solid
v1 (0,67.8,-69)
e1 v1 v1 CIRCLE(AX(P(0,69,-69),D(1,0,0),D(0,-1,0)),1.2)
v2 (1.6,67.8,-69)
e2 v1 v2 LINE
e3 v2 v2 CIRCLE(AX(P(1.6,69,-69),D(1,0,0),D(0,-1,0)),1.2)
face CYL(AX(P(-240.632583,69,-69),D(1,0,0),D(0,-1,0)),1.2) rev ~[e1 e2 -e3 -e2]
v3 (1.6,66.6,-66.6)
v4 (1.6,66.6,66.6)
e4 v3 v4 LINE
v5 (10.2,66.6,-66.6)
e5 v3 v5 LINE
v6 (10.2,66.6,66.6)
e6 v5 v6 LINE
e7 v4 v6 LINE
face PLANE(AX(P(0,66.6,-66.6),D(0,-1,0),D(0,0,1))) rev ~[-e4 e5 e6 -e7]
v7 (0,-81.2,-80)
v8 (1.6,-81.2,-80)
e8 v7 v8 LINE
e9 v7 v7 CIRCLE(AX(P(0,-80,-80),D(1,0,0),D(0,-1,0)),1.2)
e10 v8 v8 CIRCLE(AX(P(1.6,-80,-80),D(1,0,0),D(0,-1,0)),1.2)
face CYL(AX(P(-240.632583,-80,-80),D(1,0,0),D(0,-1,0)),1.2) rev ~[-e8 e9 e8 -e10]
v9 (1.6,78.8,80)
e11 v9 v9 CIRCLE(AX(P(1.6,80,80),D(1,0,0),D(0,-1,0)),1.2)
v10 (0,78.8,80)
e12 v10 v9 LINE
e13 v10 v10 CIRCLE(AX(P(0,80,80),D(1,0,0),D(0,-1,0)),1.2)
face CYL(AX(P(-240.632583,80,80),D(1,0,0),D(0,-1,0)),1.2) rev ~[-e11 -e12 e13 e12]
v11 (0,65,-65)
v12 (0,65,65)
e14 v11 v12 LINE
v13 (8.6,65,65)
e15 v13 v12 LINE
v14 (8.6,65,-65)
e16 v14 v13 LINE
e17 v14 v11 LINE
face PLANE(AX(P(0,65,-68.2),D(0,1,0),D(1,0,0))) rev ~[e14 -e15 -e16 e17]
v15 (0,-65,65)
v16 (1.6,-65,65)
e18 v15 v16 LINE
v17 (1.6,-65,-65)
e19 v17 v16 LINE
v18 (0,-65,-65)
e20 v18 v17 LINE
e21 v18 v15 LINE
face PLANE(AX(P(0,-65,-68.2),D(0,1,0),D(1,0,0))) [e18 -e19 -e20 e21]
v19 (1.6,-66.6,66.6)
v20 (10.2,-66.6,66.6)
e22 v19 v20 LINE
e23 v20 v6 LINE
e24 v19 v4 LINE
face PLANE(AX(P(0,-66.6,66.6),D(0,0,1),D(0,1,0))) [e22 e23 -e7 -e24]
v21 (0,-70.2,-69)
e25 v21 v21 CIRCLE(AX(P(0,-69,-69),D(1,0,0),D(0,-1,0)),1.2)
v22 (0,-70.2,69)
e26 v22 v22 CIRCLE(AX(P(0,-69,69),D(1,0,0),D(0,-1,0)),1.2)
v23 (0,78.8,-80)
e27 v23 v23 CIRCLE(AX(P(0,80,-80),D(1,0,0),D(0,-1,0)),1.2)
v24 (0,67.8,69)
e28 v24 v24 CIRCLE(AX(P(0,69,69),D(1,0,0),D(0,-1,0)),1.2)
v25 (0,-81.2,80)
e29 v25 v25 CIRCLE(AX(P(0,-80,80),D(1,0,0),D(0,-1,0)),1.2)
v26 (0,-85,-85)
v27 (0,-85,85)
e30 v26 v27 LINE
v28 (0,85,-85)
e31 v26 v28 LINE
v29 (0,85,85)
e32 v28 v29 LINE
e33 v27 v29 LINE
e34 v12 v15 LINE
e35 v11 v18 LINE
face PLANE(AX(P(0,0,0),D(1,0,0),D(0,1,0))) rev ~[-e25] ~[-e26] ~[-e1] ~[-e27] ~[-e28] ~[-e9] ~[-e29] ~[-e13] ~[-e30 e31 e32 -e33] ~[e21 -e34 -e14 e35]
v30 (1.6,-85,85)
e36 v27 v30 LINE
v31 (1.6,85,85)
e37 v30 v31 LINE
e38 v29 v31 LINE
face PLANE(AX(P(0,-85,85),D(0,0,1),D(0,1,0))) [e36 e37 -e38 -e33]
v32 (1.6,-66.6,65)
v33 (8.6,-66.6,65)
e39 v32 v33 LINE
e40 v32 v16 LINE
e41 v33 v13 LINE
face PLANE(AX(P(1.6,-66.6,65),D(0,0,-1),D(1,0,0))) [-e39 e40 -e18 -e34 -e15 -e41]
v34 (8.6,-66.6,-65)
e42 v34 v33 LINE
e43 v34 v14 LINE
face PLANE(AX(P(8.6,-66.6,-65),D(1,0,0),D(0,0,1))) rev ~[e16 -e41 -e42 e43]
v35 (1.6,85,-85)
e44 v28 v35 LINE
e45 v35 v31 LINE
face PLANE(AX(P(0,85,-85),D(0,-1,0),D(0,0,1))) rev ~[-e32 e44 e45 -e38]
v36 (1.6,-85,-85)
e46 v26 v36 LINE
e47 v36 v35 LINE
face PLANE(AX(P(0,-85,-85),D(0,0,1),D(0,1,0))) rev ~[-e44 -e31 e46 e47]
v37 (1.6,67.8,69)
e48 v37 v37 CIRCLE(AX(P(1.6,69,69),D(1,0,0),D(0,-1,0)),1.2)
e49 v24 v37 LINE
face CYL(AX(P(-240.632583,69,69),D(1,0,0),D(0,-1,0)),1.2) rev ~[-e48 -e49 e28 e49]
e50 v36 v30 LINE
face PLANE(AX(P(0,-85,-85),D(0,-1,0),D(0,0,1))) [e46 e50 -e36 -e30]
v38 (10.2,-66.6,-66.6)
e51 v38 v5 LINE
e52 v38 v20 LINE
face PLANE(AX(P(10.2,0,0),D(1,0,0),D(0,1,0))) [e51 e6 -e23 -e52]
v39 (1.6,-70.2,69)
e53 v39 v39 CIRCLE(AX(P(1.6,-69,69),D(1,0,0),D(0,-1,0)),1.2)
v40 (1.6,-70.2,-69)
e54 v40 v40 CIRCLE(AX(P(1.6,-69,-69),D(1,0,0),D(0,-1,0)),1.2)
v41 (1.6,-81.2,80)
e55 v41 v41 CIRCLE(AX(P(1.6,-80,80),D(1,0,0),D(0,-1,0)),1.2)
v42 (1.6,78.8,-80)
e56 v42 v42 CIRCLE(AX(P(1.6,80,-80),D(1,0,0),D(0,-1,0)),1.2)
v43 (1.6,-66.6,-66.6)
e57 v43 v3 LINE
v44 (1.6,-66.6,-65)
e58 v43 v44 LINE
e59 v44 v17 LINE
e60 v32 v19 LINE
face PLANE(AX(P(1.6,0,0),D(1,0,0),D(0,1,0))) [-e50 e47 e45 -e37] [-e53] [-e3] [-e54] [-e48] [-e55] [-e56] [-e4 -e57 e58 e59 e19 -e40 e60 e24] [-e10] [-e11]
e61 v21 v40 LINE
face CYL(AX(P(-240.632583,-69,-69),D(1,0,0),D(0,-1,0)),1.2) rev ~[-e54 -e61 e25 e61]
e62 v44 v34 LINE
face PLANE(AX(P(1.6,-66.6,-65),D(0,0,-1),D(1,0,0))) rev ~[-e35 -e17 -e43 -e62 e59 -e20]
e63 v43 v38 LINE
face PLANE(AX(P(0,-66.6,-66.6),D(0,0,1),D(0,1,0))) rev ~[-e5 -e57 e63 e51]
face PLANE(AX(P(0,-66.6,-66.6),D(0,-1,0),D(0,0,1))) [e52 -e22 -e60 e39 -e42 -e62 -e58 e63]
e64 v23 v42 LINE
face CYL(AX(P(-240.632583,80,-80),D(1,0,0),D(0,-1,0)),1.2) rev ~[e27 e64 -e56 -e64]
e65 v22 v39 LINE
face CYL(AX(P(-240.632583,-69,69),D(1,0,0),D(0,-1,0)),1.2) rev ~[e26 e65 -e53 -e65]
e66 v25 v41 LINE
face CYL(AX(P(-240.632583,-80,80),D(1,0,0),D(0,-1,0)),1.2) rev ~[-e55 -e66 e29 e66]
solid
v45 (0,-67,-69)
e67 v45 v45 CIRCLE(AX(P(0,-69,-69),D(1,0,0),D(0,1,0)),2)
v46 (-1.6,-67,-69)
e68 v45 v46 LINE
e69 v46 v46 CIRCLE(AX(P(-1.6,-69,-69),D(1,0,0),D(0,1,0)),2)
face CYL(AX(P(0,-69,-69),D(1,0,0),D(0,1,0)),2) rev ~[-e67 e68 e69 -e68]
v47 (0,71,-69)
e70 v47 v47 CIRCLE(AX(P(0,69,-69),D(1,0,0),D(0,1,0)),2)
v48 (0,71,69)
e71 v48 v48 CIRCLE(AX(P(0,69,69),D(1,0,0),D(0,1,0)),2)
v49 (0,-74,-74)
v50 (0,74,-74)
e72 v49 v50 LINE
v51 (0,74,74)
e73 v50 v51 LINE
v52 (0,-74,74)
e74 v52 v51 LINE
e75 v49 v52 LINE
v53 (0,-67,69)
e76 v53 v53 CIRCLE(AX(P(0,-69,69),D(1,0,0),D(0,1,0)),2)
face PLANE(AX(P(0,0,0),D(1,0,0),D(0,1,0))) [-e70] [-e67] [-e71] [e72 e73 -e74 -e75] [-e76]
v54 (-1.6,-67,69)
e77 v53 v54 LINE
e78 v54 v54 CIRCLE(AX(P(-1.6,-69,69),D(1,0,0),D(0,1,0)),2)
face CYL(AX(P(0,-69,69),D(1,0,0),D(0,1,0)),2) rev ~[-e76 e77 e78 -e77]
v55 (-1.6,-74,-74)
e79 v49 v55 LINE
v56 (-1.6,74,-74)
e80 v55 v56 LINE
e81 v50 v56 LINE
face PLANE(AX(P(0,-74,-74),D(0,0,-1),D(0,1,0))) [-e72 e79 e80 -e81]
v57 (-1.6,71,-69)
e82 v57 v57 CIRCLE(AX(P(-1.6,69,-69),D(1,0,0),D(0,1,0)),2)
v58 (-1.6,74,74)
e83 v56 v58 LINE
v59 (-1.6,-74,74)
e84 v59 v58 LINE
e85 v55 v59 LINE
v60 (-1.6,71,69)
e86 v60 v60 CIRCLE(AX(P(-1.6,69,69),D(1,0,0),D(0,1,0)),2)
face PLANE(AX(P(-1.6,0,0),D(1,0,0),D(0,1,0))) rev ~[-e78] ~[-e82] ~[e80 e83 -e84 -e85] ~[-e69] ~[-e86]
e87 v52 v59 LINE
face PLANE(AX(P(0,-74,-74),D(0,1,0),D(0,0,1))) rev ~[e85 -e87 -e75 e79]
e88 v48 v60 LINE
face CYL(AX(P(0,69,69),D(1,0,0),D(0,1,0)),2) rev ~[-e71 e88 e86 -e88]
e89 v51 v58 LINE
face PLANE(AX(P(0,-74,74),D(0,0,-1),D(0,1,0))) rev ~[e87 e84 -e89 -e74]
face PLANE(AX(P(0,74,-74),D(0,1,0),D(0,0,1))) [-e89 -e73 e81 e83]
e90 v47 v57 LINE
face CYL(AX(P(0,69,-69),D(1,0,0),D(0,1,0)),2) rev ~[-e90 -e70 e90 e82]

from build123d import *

# Parameters (mm, degrees)
F0_W        = 170
F0_H        = 170
F0_W_2      = 133.2
F0_H_2      = 133.2
F1_DEPTH    = 1.6
F2_DEPTH    = 10.2
F3_T        = 1.6
F3_T3_DEPTH = 136.4
F3_T5_DEPTH = 136.4
F4_W        = 7
F4_H        = 130
F5_DEPTH    = 1.6
F6_D        = 2.4
F7_W        = 148
F7_H        = 148
F7_R        = 2
F8_DEPTH    = 1.6


# Not quite as in the source:
# - a shell that OpenCascade refuses in one call is made with other operations: the cavity is built on its own and cut out


with BuildPart() as f1:
    # F0 (on Right) → F1 (new body)
    with BuildSketch(Plane.YZ):
        Rectangle(F0_W, F0_H)
        Rectangle(F0_W_2, F0_H_2, mode=Mode.SUBTRACT)
    extrude(amount=F1_DEPTH)

    # F0 (on Right) → F2 (join)
    with BuildSketch(Plane.YZ):
        Rectangle(F0_W_2, F0_H_2)
    extrude(amount=F2_DEPTH)

    # F3: shell of thickness 1.6, made by hand


with BuildPart() as f3_core1:
    # F3_t2: copy of F1
    add(f1.part)

    # the walls: a layer under each face that stays
    f3_faces = [f3_core1.faces().sort_by_distance(p)[0] for p in [
        (0.8, 0, -85),
        (0.8, -85, 0),
        (0.8, 85, 0),
        (1.6, -72.8571428571, -72.8571428571),
        (0.8, 0, 85),
        (5.9, 66.6, 0),
        (5.9, 0, -66.6),
        (5.9, -66.6, 0),
        (5.9, 0, 66.6),
        (10.2, 0, 0),
    ]]
    thicken(f3_faces, amount=-F3_T, mode=Mode.SUBTRACT)

    # F3_s4 → F3_t3 (cut)
    with BuildSketch(Plane.XY.offset(-68.2)):
        Polygon((1.616, 66.616), (0, 66.6), (0, 65), (1.6, 65), align=None)
        Polygon((1.616, -66.616), (0, -66.6), (0, -65), (1.6, -65), align=None)
    extrude(amount=F3_T3_DEPTH, mode=Mode.SUBTRACT)

    # F3_s6 → F3_t5 (cut)
    with BuildSketch(Plane.XZ.offset(-68.2)):
        Polygon((1.616, -66.616), (0, -66.6), (0, -65), (1.6, -65), align=None)
        Polygon((1.616, 66.616), (0, 66.6), (0, 65), (1.6, 65), align=None)
    extrude(amount=F3_T5_DEPTH, mode=Mode.SUBTRACT)


with BuildPart() as f1_1:
    add(f1.part)

    # what is left inside the walls is the cavity
    f3_cavity = [f3_core1.part.solids().sort_by_distance(p)[0] for p in [
        (0.016, 0, -21.666667),
    ]]
    add(f3_cavity, mode=Mode.SUBTRACT)

    # F4 (on face) → F5 (cut, through all)
    with BuildSketch(Plane.XZ.offset(66.6)):
        with Locations((5.1, 0)):
            Rectangle(F4_W, F4_H)
    extrude(amount=-F5_DEPTH, mode=Mode.SUBTRACT)

    # F6 (through all)
    with Locations(Plane(origin=(0, 0, 0), x_dir=(0, 1, 0), z_dir=(-1, 0, 0))):
        with Locations((80, -80), (69, -69), (69, 69), (80, 80), (-69, 69), (-80, 80), (-80, -80), (-69, -69)):
            Hole(F6_D / 2)


with BuildPart() as f8:
    # F7 (on face) → F8 (new body)
    with BuildSketch(Plane.YZ):
        Rectangle(F7_W, F7_H)
        with Locations((-69, -69)):
            Circle(F7_R, mode=Mode.SUBTRACT)
        with Locations((69, -69)):
            Circle(F7_R, mode=Mode.SUBTRACT)
        with Locations((-69, 69)):
            Circle(F7_R, mode=Mode.SUBTRACT)
        with Locations((69, 69)):
            Circle(F7_R, mode=Mode.SUBTRACT)
    extrude(amount=-F8_DEPTH)


solid = Compound([f1_1.part, f8.part])
